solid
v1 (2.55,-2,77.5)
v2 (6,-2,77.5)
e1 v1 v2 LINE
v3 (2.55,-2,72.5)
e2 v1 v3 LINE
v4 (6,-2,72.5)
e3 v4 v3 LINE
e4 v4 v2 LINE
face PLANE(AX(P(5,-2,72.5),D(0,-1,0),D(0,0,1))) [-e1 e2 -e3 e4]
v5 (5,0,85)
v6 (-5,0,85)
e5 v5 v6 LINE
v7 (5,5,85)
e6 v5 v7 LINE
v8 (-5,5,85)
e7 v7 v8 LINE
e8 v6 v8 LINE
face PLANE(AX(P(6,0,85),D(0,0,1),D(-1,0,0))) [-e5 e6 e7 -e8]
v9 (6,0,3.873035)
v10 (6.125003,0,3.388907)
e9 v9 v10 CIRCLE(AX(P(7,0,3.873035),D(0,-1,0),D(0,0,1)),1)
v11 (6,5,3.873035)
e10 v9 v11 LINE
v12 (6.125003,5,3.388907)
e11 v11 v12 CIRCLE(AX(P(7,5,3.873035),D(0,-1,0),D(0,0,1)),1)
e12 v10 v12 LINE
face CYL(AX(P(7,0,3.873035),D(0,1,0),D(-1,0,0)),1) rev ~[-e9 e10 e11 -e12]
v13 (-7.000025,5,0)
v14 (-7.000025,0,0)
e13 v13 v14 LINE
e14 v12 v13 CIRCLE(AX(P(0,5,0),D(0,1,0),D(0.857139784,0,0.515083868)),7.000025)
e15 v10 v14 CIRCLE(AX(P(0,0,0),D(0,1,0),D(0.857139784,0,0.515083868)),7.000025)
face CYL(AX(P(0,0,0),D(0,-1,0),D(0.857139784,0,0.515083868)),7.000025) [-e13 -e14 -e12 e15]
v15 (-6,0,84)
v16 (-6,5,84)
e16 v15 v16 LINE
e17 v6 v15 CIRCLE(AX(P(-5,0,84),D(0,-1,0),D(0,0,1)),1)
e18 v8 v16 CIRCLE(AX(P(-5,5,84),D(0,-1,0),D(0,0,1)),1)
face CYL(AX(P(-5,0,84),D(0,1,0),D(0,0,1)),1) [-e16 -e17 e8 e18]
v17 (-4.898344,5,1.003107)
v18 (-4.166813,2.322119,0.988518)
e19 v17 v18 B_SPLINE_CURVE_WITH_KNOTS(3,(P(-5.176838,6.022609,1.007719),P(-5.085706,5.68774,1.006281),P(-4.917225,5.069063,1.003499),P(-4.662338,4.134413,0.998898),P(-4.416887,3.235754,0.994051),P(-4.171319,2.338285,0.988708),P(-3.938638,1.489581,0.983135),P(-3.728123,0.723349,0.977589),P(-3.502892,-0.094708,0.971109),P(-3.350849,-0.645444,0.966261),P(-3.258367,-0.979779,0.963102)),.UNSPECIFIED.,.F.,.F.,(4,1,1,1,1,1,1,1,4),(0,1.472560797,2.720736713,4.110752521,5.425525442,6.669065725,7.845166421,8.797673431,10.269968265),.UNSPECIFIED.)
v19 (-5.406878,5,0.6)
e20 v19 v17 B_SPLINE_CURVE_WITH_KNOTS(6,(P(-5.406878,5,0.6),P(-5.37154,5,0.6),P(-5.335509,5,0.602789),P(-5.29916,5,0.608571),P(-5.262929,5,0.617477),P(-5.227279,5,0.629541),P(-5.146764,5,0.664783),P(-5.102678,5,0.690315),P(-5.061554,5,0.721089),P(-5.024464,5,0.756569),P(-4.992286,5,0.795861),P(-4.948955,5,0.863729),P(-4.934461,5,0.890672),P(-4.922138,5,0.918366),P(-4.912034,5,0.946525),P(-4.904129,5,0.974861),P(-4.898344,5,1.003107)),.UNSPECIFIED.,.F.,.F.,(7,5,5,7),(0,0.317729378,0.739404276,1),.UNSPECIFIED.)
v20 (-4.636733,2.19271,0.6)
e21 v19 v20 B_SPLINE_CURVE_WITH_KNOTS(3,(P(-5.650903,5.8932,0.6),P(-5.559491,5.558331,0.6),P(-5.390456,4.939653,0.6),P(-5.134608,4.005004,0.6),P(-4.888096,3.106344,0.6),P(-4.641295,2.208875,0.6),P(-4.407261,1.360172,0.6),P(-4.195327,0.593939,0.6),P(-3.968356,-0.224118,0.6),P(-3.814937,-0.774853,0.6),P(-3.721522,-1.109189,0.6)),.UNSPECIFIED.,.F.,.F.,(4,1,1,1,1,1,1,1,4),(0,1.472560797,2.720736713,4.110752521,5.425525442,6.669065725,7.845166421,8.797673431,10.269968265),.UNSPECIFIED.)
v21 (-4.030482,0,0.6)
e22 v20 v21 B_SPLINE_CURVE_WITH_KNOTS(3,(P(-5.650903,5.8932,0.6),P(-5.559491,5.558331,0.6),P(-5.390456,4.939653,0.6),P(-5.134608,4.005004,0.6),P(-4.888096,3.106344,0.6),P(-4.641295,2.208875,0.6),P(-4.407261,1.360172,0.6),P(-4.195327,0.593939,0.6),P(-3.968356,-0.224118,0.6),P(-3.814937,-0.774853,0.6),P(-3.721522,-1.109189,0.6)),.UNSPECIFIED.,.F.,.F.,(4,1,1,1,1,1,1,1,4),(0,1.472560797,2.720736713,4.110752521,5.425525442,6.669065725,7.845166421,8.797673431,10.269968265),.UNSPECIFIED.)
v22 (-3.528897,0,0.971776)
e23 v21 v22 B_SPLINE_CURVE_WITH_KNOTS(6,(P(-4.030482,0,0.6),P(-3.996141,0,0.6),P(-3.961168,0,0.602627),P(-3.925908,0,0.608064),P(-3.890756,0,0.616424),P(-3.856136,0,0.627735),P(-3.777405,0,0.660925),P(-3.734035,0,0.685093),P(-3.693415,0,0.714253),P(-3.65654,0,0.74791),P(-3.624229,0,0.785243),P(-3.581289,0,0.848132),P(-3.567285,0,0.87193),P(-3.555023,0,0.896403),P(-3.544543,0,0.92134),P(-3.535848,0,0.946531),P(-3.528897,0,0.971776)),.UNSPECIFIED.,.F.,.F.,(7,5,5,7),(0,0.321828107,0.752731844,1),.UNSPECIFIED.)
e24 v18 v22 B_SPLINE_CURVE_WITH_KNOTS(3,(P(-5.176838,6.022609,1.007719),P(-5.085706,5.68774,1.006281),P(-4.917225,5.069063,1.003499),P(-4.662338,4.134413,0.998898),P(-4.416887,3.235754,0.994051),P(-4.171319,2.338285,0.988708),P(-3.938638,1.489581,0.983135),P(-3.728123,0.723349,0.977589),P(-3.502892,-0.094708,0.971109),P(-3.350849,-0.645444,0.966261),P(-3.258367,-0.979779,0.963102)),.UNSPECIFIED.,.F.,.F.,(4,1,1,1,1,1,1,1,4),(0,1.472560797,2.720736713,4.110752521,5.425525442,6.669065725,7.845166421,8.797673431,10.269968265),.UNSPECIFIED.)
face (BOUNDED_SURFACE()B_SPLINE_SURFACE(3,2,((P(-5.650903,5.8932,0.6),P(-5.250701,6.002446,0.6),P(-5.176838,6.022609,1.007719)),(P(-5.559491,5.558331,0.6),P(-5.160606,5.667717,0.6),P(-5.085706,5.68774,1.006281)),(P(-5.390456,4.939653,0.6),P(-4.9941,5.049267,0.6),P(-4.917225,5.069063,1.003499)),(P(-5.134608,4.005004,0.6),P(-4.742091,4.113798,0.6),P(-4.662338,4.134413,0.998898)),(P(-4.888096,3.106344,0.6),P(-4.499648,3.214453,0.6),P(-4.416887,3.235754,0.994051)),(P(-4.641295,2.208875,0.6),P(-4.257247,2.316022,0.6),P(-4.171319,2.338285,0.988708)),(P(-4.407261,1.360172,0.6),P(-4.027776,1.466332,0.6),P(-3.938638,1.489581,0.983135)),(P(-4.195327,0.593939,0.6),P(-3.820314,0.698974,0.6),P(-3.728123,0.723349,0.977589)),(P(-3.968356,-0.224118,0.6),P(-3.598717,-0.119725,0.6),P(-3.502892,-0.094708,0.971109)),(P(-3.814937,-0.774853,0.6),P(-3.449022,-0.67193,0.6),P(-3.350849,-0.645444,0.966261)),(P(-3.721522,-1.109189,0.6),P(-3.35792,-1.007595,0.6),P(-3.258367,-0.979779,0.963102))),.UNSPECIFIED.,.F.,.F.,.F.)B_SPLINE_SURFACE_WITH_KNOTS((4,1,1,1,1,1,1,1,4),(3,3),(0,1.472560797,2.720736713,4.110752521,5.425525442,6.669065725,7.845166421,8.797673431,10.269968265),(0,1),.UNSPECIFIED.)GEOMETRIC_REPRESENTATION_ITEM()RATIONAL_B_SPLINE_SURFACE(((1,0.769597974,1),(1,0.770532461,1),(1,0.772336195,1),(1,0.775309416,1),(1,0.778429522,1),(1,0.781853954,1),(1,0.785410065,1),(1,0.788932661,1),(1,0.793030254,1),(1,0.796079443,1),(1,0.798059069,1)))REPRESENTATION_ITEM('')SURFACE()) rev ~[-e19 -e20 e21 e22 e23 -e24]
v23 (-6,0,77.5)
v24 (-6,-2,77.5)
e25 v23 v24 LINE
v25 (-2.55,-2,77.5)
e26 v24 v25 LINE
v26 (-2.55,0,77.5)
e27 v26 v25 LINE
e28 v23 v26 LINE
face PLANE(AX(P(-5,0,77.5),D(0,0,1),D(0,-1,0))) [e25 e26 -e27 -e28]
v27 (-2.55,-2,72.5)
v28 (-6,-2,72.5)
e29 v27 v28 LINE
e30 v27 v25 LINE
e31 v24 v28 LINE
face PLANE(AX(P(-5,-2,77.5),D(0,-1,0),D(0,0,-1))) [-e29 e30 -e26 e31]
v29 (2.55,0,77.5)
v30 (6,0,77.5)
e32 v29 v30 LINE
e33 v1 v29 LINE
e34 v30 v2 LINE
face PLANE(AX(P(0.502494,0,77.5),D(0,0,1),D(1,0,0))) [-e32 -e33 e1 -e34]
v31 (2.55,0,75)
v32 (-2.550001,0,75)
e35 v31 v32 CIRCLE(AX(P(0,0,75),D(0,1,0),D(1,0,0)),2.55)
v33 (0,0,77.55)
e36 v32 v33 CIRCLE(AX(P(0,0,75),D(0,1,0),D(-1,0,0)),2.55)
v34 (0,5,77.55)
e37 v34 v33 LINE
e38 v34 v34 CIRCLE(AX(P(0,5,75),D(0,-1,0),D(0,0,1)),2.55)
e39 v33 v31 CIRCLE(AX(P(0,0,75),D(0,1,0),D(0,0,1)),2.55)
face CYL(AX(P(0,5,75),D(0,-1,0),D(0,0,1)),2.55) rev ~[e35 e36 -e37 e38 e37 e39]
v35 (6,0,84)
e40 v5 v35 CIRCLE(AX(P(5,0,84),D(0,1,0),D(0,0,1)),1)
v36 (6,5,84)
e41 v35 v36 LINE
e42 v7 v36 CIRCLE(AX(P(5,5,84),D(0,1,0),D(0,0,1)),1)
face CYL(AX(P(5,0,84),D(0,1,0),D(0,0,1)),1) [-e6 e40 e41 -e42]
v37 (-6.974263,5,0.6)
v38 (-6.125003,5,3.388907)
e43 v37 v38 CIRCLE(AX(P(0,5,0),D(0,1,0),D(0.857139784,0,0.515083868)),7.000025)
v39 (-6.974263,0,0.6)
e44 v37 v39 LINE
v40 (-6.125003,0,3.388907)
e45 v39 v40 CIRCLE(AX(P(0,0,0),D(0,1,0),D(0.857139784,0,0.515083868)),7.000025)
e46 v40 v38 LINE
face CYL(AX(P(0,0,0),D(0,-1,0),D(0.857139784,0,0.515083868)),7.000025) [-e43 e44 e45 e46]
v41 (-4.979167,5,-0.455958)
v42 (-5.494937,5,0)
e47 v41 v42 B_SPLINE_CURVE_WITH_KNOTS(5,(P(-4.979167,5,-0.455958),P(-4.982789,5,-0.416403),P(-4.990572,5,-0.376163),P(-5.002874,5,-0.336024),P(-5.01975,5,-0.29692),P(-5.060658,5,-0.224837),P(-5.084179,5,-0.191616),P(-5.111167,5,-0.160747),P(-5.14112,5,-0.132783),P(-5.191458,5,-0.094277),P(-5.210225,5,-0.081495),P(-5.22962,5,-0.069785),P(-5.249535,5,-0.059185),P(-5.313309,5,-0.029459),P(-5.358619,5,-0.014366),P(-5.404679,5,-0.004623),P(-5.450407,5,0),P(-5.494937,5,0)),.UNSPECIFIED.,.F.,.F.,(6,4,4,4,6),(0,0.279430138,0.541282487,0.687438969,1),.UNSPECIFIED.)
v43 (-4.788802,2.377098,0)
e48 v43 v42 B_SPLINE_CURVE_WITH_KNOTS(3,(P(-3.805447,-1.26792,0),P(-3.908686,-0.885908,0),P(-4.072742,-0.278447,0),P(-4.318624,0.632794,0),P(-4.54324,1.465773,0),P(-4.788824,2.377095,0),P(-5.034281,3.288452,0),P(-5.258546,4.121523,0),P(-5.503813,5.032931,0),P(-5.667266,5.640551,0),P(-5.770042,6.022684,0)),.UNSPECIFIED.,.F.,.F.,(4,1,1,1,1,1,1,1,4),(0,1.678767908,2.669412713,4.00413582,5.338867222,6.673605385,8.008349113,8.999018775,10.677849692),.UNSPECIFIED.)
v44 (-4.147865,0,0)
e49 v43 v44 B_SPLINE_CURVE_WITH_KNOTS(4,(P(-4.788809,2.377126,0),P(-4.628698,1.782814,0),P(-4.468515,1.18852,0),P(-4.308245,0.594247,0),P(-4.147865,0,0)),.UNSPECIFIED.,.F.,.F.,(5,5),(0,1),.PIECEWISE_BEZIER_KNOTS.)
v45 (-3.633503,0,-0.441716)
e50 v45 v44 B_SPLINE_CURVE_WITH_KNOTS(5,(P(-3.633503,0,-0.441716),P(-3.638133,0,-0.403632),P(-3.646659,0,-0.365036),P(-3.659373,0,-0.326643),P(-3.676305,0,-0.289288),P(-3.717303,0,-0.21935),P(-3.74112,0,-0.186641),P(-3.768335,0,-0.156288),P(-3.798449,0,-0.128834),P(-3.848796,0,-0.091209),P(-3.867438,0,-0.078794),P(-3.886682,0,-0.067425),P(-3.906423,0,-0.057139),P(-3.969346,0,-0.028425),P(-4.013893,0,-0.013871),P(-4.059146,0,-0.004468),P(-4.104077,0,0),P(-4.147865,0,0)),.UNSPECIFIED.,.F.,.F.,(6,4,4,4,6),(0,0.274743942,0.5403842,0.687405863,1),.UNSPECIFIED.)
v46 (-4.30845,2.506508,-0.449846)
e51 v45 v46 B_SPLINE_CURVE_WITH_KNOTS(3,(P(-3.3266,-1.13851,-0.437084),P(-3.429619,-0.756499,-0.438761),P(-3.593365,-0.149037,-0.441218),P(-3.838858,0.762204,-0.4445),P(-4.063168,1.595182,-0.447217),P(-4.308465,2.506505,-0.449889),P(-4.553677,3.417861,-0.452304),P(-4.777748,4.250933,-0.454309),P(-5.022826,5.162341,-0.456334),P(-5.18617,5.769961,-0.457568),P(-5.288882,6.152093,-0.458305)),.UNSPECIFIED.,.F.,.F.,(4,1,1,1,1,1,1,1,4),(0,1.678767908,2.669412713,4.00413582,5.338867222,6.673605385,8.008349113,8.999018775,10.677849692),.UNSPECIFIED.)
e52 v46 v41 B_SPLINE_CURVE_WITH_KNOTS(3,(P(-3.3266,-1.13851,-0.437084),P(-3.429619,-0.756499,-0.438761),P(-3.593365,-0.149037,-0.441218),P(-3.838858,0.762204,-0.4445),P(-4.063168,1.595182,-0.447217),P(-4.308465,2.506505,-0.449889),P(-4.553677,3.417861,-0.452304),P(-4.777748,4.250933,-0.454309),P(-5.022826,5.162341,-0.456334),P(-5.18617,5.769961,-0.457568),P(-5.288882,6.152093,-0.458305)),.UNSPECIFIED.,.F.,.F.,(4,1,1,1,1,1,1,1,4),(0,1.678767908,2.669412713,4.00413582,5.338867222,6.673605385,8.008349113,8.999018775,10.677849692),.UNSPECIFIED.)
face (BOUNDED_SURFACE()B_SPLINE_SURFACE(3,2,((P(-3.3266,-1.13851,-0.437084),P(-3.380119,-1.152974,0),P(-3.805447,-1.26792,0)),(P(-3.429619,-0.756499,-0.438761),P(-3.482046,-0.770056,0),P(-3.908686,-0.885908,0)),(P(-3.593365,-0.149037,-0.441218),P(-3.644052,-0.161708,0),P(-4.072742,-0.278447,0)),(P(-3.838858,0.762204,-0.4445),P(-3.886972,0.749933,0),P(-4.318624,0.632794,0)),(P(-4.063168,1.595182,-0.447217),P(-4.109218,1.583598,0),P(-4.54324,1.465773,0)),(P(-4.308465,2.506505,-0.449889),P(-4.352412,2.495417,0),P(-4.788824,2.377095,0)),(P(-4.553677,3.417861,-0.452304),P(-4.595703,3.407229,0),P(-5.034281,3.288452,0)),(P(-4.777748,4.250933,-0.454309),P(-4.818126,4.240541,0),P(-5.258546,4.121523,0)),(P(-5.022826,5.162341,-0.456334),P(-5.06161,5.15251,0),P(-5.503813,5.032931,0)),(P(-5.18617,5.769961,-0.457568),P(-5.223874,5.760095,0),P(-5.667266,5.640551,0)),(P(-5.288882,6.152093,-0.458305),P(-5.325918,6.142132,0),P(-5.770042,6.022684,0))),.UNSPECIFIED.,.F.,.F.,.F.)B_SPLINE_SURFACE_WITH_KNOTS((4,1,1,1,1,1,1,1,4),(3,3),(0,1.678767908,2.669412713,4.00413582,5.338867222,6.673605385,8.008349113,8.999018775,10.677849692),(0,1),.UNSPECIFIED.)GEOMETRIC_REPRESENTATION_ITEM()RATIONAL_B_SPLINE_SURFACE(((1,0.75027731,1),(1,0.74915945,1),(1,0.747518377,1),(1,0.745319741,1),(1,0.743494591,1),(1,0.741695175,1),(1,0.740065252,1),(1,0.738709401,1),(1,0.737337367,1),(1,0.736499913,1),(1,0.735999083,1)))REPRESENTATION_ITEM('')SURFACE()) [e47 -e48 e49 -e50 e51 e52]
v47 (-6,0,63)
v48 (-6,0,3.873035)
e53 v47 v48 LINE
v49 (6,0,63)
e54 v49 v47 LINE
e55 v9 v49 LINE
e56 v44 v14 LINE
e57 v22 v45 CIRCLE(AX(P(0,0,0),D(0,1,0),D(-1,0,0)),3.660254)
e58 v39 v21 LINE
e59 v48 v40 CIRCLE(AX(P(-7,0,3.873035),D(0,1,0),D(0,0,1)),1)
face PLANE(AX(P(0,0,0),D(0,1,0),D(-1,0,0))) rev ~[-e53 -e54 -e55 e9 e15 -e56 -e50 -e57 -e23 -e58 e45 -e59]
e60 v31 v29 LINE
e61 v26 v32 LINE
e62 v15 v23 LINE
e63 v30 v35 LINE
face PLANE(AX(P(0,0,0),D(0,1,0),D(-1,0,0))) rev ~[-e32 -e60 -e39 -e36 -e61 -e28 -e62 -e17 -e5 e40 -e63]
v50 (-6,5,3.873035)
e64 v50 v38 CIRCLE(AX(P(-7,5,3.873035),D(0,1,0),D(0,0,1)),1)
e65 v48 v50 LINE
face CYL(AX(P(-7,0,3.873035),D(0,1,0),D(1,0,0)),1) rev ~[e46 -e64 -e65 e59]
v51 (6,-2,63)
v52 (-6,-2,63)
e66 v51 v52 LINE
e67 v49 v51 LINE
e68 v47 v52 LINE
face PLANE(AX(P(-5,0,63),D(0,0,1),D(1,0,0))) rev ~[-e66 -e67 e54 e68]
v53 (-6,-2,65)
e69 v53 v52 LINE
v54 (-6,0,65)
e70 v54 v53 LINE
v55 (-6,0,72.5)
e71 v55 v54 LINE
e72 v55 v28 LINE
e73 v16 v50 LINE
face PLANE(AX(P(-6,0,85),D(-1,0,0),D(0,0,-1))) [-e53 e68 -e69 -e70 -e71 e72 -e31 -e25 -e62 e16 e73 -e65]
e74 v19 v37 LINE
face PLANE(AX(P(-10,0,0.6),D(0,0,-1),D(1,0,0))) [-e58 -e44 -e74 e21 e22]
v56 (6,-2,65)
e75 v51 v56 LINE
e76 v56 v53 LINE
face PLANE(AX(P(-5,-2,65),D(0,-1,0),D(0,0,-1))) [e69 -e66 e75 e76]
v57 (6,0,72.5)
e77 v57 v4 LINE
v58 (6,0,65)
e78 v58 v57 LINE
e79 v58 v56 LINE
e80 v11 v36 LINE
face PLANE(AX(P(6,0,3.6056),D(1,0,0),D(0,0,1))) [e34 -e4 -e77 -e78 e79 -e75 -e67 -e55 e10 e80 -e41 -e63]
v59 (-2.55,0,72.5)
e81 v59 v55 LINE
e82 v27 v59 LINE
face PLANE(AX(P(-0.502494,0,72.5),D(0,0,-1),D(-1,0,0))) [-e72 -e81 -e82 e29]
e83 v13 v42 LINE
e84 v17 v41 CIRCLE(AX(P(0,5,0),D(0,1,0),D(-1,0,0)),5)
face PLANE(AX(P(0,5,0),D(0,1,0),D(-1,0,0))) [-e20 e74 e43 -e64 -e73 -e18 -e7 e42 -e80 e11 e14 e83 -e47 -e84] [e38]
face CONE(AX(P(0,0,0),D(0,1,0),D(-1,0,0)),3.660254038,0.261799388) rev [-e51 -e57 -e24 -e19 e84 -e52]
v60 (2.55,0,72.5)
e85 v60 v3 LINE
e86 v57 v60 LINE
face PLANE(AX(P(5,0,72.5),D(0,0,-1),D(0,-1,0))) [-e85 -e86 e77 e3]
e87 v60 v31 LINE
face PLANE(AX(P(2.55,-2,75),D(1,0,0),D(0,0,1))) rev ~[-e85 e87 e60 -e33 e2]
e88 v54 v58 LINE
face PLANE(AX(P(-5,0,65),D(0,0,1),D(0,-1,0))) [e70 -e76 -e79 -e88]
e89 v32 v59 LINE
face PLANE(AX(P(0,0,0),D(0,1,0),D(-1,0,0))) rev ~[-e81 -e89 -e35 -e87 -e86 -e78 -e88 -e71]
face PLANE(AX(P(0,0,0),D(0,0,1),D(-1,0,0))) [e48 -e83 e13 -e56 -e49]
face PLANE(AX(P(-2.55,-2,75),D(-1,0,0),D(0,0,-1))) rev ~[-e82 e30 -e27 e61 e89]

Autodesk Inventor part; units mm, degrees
ref_plane "YZ Plane" through (0, 0, 0) normal (1, 0, 0) x (0, 1, 0)
ref_plane "XZ Plane" through (0, 0, 0) normal (0, 1, 0) x (-1, 0, 0)
ref_plane "XY Plane" through (0, 0, 0) normal (0, 0, 1) x (1, 0, 0)
sketch "Sketch1" plane through (0, 0, 0) normal (0, 1, 0) x (-1, 0, 0)
  circle A0 centre (0, 0) radius 5
  line L0 (-6, 85) -> (6, 85)
  arc A1 (-6, 3.6056) -> (6, 3.6056) centre (0, 0) ccw
  line L1 (-6, 3.6056) -> (-6, 85)
  line L2 (6, 85) -> (6, 3.6056)
  point P0 (-6, 0)
  point P1 (-5, 85)
  point P2 (5, 85)
extrude "Extrusion1" add sketch "Sketch1" along normal blind 5
sketch "Sketch2" plane through (0, 5, 0) normal (0, 1, 0) x (1, 0, 0)
  line L0 (-6, -85) -> (6, -85) construction
  line L1 (0, -85) -> (0, -75) construction
  point P0 (0, 0)
  point P1 (-5, -85)
  point P2 (5, -85)
  dimension "d5" = 10
hole "Hole1" at (0, 5, 75) direction (0, -1, 0) diameter 5.1 end through all
draft "FaceDraft1" angle 15 pull direction (0, 1, 0) faces at (-4.9353, 3.3333, -0.8021) fixed edges at (5, 5, 0)
sketch "Sketch3" plane through (0, 0, 0) normal (0, -1, 0) x (1, 0, 0)
  line L0 (0, 0) -> (-10, 0)
  line L1 (-10, 0) -> (-10, 0.6)
  line L2 (-10, 0.6) -> (0, 0.6)
  line L3 (0, 0.6) -> (0, 0)
  dimension "d15" = 0.6
  dimension "d19" = 10
extrude "Extrusion2" cut sketch "Sketch3" against normal blind 10
fillet "Fillet2" radius 0.5 2 edges at (-4.2347, 2.3015, 0.6) (-4.3301, 2.5, 0)
sketch "Sketch4" plane through (0, 0, 0) normal (0, -1, 0) x (1, 0, 0)
  line L0 (6, 85) -> (-6, 85) construction
  line L1 (0, 85) -> (0, 65) construction
  line L2 (5, 84) -> (5, 4.3589) projected
  line L3 (-5, 4.3589) -> (-5, 84) projected
  line L4 (5, 65) -> (-5, 65)
  line L5 (-5, 65) -> (-5, 63)
  line L6 (-5, 63) -> (5, 63)
  line L7 (5, 63) -> (5, 65)
  line L8 (-5, 77.5) -> (5, 77.5)
  line L9 (5, 77.5) -> (5, 72.5)
  line L10 (5, 72.5) -> (-5, 72.5)
  line L11 (-5, 72.5) -> (-5, 77.5)
  line L12 (-5, 77.5) -> (5, 72.5) construction
  line L13 (5, 77.5) -> (-5, 72.5) construction
  circle A0 centre (0, 75) radius 2.55 projected
  point P0 (0, 0)
  point P1 (4, 85)
  point P2 (-4, 85)
  dimension "d21" = 20
  dimension "d22" = 2
  dimension "d23" = 5
extrude "Extrusion3" add sketch "Sketch4" along normal blind 2 contours L2 L10 A0 L8 | L2 L6 L3 L4 | A0 L10 L3 L8
sketch "Sketch5" plane through (0, -2, 0) normal (0, -1, 0) x (1, 0, 0)
  arc A0 (0.5025, 72.5) -> (0.5025, 77.5) centre (0, 75) ccw projected
  circle A1 centre (0, 75) radius 2.55 projected
  line L0 (2.55, 77.55) -> (-2.55, 77.55)
  line L1 (-2.55, 77.55) -> (-2.55, 72.45)
  line L2 (-2.55, 72.45) -> (2.55, 72.45)
  line L3 (2.55, 72.45) -> (2.55, 77.55)
  line L4 (2.55, 77.55) -> (-2.55, 72.45) construction
  line L5 (-2.55, 77.55) -> (2.55, 72.45) construction
  arc A2 (-0.5025, 72.5) -> (0.5025, 72.5) centre (0, 75) ccw projected
  arc A3 (0.5025, 77.5) -> (-0.5025, 77.5) centre (0, 75) ccw projected
  arc A4 (-0.5025, 77.5) -> (-0.5025, 72.5) centre (0, 75) ccw projected
  point P0 (0, 0)
  dimension "d26" = 5.1
  dimension "d27" = 5.1
extrude "Extrusion4" cut sketch "Sketch5" against normal blind 2 contours A0 L3 L2 A1 | A0 A1 L0 L3 | L2 L1 A1 | A1 L1 L0
sketch "Sketch6" plane through (-5, 0, 72.5) normal (-1, 0, 0) x (0, 0, 1)
  line L0 (0, 0) -> (5, 0) projected
  line L1 (0, 0) -> (0, -2) projected
  line L2 (5, -2) -> (0, -2) projected
  line L3 (5, 0) -> (5, -2) projected
  line L4 (-9.5, 0) -> (-7.5, 0) projected
  line L5 (-9.5, 0) -> (-9.5, -2) projected
  line L6 (-7.5, -2) -> (-9.5, -2) projected
  line L7 (-7.5, 0) -> (-7.5, -2) projected
  point P0 (-72.5, 0)
extrude "Extrusion5" add sketch "Sketch6" along normal blind 1
sketch "Sketch7" plane through (5, 0, 77.5) normal (1, 0, 0) x (0, 0, -1)
  line L0 (0, 0) -> (5, 0) projected
  line L1 (0, 0) -> (0, -2) projected
  line L2 (5, -2) -> (0, -2) projected
  line L3 (5, 0) -> (5, -2) projected
  line L4 (12.5, 0) -> (14.5, 0) projected
  line L5 (12.5, 0) -> (12.5, -2) projected
  line L6 (14.5, -2) -> (12.5, -2) projected
  line L7 (14.5, 0) -> (14.5, -2) projected
  point P0 (77.5, 0)
extrude "Extrusion6" add sketch "Sketch7" along normal blind 1
fillet "Fillet4" radius 1 4 edges at (6, 2.5, 85) (-6, 2.5, 85) (6, 2.5, 3.6056) (-6, 2.5, 3.6056)
properties part number "filament guide stronger"
